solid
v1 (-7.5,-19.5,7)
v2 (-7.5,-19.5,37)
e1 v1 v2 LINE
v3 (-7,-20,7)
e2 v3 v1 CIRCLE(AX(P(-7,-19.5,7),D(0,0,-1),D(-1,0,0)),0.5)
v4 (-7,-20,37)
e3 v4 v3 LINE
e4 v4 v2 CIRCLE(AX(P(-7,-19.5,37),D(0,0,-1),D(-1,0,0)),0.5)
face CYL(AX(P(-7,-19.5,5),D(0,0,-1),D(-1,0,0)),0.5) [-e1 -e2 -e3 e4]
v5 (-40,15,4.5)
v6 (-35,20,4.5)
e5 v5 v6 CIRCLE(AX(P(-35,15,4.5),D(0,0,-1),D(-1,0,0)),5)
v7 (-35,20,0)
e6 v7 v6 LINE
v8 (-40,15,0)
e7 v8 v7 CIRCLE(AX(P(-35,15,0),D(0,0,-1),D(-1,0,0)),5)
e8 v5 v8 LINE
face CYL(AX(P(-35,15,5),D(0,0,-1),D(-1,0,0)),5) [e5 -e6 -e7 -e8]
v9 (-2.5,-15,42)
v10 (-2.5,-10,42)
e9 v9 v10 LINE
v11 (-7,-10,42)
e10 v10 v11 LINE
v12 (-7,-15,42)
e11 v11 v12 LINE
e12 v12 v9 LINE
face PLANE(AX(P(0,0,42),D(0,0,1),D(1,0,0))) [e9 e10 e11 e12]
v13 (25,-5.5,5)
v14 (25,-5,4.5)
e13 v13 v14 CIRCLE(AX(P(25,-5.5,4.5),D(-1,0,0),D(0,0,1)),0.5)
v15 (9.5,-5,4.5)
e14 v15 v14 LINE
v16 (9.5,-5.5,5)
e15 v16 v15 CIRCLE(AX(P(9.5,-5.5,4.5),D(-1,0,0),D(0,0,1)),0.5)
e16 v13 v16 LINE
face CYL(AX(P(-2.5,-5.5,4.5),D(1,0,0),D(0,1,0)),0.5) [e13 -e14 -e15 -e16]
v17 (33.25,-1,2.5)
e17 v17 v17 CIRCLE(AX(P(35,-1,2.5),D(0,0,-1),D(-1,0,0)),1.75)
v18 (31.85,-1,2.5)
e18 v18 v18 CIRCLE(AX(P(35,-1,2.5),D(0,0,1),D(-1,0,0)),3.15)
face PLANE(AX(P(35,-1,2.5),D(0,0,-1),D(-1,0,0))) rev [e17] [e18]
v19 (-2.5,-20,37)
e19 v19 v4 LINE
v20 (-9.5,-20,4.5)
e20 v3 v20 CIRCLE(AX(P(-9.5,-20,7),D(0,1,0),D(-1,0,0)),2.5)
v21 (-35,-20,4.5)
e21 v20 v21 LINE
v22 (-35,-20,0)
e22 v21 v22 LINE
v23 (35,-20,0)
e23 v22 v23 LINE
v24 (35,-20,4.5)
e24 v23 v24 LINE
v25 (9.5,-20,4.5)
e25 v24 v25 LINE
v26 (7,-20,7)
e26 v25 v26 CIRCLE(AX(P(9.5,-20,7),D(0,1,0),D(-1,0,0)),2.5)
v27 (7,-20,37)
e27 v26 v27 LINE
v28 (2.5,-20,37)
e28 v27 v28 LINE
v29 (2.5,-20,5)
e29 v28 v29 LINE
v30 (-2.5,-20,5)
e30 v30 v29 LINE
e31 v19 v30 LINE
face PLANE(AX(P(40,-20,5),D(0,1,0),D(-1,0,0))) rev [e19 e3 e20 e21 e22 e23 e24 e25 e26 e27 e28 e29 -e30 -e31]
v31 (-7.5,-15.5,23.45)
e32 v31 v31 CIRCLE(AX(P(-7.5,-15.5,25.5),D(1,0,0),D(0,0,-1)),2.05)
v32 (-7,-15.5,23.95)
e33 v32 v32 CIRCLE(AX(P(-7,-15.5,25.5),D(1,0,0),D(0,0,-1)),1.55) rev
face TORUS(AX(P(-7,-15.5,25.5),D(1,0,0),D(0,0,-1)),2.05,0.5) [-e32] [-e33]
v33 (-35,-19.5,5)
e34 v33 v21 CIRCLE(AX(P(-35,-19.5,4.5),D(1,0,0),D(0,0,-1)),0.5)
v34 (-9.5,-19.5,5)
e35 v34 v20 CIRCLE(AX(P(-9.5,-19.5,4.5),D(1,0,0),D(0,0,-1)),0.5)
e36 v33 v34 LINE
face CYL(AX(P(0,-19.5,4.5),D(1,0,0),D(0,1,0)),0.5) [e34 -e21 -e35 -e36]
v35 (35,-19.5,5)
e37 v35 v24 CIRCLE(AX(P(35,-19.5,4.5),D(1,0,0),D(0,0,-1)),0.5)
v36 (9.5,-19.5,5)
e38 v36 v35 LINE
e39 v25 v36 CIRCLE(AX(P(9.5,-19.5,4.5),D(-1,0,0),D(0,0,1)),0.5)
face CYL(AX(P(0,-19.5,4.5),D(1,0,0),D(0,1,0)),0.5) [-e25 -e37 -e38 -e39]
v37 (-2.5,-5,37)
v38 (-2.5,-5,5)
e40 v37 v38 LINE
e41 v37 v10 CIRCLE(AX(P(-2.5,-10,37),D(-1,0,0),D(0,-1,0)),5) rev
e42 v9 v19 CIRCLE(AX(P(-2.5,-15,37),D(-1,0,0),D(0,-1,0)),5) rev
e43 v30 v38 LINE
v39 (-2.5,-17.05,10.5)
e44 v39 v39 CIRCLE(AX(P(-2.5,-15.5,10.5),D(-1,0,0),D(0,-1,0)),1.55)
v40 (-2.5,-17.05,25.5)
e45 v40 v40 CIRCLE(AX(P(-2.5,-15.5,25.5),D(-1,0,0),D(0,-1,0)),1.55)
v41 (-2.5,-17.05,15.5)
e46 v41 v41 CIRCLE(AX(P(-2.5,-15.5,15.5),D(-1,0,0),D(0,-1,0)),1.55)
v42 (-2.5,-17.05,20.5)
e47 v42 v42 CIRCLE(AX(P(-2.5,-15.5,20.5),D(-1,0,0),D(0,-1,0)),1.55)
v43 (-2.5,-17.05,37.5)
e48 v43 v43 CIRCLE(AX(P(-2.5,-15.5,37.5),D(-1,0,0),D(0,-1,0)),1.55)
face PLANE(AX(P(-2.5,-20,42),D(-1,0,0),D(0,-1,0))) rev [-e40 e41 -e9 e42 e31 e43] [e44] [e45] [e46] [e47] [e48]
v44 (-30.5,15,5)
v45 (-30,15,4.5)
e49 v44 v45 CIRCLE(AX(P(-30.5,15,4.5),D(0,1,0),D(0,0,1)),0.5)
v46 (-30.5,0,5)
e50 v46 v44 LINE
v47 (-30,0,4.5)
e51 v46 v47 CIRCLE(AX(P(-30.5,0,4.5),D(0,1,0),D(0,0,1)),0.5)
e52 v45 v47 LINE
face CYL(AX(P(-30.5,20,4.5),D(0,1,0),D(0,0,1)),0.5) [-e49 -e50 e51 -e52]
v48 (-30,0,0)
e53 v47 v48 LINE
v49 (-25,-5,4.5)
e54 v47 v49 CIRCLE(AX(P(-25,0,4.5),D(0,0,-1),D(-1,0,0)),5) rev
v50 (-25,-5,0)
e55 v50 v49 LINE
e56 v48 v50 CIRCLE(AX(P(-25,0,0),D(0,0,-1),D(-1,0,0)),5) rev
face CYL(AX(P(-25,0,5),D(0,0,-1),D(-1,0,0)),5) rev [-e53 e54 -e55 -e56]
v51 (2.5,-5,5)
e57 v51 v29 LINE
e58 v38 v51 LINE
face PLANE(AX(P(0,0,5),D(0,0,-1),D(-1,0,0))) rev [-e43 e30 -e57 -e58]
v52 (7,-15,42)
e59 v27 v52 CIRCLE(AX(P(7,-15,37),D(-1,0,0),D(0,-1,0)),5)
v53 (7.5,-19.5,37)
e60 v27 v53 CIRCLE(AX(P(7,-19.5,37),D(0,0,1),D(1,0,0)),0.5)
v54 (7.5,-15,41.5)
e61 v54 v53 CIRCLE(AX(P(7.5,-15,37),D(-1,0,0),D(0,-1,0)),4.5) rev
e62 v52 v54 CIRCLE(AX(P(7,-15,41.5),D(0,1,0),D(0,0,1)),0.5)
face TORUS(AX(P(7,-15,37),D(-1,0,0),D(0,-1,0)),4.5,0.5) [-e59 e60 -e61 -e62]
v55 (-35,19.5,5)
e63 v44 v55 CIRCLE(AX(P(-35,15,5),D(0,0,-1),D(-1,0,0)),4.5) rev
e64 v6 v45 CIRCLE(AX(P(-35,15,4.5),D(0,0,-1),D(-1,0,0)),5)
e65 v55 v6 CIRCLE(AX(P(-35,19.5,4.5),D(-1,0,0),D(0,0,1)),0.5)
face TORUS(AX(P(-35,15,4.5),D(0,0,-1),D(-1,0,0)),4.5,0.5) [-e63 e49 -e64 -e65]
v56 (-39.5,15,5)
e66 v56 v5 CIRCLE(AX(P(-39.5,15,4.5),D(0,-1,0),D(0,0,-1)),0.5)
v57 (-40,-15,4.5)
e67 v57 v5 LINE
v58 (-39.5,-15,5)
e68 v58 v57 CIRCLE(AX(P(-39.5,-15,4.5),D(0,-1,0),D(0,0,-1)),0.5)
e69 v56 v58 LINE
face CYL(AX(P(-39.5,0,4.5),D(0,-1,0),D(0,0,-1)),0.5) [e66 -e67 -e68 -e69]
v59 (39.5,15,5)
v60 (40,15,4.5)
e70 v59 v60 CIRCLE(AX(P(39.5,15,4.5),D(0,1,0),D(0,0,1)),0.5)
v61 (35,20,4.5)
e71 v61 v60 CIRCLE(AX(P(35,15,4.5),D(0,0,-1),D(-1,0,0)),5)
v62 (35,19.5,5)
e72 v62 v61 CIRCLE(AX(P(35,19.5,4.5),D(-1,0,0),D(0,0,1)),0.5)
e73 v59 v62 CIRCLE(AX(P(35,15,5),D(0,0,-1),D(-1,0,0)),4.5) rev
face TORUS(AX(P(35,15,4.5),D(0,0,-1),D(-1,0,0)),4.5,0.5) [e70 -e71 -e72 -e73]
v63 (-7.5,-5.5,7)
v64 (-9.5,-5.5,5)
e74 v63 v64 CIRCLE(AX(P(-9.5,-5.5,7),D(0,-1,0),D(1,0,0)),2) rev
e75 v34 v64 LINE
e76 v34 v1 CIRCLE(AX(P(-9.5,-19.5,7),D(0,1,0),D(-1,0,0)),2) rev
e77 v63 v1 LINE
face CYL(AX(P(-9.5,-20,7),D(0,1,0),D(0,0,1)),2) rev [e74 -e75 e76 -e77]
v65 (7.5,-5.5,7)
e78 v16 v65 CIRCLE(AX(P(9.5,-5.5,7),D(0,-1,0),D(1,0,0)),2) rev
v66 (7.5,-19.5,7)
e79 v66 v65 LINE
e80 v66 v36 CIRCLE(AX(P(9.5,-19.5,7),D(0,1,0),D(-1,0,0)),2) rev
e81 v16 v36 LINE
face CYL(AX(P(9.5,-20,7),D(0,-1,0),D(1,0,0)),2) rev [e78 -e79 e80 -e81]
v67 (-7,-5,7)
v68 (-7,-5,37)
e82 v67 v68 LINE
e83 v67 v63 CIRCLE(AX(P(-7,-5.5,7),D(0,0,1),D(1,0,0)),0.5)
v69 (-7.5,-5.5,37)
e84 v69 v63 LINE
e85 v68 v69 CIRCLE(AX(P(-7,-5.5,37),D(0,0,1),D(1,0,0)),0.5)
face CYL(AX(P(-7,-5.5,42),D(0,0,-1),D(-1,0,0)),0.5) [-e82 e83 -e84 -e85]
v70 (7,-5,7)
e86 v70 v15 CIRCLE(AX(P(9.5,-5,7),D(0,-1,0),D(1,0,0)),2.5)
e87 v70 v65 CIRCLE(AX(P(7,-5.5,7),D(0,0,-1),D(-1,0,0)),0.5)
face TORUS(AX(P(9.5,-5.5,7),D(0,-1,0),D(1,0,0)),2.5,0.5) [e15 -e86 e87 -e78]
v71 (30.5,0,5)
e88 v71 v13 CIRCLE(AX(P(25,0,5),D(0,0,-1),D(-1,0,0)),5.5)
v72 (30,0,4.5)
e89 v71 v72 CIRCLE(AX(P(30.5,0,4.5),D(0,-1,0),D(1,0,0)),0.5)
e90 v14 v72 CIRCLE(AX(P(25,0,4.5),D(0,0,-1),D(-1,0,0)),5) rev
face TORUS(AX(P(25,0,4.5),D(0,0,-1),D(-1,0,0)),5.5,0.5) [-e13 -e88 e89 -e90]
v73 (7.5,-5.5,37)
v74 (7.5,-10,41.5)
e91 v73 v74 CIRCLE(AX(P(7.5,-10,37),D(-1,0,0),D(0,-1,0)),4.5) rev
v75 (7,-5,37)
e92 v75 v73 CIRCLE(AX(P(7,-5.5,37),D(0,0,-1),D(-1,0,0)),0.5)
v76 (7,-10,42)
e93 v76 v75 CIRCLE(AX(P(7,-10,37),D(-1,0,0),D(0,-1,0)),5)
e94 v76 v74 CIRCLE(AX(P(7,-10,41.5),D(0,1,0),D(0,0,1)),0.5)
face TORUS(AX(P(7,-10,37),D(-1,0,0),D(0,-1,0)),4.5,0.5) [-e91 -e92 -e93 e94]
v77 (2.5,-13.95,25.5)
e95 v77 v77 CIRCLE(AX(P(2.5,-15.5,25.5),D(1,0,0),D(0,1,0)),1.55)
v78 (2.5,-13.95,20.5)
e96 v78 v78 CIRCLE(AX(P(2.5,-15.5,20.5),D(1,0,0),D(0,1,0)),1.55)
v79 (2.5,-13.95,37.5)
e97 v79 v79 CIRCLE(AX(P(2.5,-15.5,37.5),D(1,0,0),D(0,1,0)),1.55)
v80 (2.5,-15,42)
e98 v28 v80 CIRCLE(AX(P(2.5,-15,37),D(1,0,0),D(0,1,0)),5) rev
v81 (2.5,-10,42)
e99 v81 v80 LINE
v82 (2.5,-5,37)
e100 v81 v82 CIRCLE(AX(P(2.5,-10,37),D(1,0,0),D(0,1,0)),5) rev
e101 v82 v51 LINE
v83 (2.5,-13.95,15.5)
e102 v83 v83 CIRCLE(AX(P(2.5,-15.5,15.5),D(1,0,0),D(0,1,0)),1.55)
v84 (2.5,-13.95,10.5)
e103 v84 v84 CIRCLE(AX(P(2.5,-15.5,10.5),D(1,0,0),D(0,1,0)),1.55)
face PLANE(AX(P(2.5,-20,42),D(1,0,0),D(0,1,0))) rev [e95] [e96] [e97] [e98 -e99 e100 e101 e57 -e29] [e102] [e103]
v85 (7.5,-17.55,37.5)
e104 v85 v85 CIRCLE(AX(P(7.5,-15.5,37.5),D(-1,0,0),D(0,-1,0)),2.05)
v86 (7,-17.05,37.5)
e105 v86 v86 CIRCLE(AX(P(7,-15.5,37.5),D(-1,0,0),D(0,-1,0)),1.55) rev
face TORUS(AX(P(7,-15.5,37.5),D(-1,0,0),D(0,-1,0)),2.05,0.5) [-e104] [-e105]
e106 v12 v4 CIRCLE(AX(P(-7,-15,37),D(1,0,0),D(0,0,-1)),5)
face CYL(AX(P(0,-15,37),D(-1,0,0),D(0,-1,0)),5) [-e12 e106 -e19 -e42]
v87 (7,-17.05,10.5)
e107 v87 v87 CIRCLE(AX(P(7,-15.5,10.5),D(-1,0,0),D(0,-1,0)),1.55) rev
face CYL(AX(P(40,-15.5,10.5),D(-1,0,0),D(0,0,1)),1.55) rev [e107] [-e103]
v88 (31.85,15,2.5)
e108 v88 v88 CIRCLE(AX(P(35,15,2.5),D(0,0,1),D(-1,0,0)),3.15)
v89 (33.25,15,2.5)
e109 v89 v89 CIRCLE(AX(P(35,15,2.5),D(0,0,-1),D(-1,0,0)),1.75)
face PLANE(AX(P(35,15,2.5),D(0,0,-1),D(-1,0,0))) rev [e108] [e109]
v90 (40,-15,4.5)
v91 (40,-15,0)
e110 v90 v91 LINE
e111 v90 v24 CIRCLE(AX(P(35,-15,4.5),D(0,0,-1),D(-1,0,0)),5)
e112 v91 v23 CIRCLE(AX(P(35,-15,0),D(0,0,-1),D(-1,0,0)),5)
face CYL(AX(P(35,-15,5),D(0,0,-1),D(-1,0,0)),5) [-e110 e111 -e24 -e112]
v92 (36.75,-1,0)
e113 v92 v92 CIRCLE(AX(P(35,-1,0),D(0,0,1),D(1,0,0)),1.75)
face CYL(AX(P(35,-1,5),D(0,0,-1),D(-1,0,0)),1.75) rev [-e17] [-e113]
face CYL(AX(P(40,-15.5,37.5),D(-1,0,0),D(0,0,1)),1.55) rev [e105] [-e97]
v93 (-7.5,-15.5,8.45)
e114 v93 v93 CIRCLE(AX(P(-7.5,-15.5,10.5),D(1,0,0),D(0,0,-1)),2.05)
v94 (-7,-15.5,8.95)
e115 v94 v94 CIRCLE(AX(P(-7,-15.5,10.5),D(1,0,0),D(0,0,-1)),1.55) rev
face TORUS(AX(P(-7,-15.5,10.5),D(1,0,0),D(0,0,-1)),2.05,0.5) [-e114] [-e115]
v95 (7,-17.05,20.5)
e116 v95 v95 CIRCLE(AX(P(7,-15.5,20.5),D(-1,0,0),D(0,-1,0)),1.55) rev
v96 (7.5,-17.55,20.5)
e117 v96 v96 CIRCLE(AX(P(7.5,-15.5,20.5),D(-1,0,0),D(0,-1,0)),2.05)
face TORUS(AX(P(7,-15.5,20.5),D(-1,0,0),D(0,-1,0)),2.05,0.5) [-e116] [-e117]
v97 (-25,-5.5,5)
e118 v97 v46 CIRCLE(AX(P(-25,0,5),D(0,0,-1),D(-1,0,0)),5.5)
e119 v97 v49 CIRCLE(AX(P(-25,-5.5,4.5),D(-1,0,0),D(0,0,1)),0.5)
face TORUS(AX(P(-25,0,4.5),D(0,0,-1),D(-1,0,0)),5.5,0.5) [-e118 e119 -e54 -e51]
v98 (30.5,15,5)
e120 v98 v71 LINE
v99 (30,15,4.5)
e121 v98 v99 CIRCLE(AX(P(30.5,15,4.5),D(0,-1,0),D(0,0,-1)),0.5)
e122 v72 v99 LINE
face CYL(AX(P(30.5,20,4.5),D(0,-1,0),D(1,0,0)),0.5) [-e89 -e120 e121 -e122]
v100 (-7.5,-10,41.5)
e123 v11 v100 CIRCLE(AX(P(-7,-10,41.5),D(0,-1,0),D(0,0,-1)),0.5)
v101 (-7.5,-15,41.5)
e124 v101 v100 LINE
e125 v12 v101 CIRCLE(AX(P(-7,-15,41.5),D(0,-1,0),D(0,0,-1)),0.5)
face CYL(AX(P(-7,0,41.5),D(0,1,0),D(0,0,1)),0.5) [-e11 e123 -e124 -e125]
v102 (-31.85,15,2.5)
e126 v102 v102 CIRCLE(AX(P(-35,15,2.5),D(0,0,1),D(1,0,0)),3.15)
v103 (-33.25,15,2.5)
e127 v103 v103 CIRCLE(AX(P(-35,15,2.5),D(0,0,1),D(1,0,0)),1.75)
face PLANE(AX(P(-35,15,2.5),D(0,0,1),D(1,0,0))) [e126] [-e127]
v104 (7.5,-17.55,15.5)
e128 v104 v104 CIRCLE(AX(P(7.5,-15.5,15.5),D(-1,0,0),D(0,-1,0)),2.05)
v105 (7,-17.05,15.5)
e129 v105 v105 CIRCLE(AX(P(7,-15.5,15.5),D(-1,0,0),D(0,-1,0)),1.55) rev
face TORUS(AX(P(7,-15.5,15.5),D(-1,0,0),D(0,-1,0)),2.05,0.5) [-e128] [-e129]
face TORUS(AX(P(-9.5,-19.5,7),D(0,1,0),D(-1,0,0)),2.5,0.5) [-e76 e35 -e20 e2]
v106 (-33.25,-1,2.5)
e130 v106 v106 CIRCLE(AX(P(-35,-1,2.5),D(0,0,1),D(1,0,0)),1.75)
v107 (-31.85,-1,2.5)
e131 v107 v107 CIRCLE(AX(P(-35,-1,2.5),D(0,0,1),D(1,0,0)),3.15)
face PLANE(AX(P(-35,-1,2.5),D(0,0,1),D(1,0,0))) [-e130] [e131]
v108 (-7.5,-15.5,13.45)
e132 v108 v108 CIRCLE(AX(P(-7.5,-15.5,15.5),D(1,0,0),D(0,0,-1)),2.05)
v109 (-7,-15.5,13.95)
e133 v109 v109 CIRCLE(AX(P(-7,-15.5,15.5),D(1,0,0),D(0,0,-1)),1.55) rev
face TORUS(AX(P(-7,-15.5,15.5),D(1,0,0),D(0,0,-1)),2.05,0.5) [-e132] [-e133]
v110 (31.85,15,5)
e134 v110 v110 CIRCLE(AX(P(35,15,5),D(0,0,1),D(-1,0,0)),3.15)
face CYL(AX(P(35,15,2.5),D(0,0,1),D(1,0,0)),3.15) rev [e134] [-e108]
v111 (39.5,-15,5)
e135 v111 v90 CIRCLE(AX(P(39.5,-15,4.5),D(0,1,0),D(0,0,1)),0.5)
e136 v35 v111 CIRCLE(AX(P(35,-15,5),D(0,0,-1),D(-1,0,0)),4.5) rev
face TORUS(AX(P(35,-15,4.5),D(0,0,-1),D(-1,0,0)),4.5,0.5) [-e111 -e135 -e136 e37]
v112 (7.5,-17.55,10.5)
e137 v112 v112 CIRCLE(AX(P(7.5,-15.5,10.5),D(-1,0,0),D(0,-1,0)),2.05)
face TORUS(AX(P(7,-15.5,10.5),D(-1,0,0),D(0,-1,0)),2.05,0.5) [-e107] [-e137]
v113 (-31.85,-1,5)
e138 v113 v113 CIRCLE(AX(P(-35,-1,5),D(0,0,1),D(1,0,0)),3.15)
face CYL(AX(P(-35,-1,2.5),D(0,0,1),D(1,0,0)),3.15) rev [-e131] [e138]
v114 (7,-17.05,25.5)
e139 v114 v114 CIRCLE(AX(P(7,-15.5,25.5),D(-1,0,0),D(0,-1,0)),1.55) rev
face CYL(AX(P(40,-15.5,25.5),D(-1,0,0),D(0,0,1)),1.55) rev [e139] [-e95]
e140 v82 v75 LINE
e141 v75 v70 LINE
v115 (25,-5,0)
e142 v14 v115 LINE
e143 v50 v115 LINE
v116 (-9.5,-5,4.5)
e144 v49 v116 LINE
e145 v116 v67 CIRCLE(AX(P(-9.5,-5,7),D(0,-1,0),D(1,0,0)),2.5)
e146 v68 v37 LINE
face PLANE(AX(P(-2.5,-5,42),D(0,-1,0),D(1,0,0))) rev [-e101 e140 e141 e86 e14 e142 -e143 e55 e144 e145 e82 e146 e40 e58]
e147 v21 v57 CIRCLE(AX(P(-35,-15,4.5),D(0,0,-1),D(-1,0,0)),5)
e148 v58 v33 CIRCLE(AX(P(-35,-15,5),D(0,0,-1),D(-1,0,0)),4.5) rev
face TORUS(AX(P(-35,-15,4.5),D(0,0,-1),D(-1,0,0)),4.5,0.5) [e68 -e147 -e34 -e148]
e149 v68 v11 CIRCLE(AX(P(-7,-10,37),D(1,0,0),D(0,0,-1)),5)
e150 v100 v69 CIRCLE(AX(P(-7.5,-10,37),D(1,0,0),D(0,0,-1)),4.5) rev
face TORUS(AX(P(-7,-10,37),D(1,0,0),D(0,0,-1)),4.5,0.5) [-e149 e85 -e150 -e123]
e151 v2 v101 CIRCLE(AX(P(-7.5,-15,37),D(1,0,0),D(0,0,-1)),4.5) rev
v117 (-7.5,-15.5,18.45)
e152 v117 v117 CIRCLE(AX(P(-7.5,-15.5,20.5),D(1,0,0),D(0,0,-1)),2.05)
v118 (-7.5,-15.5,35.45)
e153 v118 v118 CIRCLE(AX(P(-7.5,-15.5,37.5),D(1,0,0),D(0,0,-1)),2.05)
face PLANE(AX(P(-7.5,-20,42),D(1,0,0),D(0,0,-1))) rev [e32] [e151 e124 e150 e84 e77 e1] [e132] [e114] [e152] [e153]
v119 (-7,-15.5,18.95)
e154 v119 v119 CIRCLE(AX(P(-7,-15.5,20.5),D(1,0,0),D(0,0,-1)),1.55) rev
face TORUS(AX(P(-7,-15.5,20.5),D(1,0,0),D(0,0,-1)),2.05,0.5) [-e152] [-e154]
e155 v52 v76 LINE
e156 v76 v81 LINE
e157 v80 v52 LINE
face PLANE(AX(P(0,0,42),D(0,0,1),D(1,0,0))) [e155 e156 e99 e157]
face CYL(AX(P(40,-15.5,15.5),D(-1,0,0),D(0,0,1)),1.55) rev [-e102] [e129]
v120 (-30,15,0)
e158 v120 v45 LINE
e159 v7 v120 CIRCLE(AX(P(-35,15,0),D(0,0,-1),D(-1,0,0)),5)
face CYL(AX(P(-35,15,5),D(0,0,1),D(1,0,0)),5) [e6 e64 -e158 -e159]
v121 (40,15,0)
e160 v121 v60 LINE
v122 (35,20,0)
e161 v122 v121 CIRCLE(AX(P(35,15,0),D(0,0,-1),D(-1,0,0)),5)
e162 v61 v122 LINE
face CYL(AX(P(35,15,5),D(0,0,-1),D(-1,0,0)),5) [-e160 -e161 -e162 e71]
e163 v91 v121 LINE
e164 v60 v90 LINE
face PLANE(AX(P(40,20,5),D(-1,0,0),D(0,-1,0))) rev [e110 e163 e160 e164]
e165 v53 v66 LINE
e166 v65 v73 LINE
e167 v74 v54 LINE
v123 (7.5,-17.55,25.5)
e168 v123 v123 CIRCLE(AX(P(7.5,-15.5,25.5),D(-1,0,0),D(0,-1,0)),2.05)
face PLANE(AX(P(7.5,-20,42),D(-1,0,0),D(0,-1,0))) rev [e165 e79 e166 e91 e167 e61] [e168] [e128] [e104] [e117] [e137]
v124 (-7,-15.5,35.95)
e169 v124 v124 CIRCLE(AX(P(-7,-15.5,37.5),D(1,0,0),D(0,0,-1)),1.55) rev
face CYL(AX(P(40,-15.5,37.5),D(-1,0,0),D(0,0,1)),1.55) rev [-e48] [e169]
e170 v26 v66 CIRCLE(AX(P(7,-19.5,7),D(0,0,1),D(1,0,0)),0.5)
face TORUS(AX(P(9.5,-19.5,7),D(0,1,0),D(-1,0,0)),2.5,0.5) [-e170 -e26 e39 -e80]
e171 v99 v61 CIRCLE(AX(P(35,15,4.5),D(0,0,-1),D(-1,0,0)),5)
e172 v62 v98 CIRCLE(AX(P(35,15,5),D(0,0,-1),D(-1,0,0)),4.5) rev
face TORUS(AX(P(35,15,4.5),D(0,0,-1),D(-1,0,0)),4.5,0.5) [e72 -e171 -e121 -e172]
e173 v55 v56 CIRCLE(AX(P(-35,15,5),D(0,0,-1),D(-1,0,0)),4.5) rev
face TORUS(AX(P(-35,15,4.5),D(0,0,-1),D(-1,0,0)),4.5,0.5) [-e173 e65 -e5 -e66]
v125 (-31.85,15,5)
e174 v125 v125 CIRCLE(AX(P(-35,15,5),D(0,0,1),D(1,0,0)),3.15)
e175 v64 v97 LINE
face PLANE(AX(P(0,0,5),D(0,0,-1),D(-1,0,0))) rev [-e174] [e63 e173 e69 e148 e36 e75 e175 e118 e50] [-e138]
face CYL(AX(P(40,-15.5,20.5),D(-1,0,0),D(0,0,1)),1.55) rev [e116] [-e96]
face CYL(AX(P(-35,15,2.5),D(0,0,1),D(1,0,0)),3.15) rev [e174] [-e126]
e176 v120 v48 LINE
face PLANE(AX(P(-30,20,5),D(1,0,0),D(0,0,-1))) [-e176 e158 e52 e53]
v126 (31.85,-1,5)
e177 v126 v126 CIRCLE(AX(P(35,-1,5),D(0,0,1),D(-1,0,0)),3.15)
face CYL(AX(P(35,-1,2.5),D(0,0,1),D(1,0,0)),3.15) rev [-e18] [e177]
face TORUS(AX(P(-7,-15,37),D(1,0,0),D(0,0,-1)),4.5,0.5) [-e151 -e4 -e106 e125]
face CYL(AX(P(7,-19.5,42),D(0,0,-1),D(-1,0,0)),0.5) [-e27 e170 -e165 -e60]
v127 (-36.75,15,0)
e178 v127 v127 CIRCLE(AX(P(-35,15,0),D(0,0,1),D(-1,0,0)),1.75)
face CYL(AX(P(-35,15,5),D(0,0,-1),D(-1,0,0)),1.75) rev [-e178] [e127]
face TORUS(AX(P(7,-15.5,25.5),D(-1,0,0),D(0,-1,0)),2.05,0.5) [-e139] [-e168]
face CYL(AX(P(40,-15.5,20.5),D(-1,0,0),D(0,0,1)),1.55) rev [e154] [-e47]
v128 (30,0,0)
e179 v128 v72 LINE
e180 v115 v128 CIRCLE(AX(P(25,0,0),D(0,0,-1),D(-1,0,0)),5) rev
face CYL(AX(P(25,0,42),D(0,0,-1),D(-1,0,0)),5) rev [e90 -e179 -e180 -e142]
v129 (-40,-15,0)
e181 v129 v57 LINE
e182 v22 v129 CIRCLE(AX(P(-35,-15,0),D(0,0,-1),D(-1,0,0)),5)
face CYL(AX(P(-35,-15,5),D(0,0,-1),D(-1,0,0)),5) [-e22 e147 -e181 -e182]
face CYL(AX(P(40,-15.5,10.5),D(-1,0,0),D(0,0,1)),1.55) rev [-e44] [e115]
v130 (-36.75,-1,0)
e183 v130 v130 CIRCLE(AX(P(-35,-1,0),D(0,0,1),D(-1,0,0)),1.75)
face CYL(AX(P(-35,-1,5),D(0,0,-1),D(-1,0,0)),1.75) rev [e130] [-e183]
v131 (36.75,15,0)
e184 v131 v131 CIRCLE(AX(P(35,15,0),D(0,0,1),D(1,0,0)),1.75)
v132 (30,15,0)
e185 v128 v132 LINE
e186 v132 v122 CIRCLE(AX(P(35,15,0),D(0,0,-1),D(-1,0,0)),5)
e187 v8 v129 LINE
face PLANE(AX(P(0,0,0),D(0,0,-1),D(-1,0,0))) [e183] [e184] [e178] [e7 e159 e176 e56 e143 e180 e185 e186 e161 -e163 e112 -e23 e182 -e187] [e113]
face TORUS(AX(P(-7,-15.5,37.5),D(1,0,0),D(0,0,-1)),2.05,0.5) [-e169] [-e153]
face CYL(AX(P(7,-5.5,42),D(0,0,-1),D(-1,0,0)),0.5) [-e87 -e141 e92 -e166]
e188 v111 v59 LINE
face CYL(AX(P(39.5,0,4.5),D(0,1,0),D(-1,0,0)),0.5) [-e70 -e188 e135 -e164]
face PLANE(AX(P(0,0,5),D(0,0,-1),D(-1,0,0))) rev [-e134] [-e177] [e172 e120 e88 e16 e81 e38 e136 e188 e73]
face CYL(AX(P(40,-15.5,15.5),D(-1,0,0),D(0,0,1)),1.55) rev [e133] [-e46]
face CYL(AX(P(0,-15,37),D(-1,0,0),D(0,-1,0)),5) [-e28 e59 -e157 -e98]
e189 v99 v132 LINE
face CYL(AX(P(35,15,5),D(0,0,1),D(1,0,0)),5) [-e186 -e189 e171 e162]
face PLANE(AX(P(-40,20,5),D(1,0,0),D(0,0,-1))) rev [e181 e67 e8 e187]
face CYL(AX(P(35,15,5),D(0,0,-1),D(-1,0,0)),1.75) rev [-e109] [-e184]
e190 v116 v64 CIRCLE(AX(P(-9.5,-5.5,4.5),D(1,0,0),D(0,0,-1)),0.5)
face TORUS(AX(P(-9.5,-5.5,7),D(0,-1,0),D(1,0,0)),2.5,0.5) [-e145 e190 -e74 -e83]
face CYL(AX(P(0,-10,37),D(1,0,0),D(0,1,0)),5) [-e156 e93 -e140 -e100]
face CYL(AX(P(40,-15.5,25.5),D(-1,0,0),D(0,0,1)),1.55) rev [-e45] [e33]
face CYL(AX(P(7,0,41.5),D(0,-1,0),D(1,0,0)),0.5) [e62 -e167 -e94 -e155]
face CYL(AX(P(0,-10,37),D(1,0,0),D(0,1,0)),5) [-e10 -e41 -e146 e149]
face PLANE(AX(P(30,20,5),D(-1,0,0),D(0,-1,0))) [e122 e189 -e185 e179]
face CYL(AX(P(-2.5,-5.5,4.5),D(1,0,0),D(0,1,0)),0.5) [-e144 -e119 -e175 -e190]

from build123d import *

# Parameters (mm, degrees)
SKETCH_1_W          = 80
SKETCH_1_H          = 40
EXTRUDE_1_DEPTH     = 5
SKETCH_2_R          = 1.75
CUT_EXTRUDE_1_DEPTH = 46
SKETCH_3_W          = 5
SKETCH_3_H          = 15
EXTRUDE_2_DEPTH     = 37
SKETCH_4_R          = 1.55
CUT_EXTRUDE_2_DEPTH = 67.484960705
SKETCH_5_W          = 60
SKETCH_5_H          = 25
CUT_EXTRUDE_3_DEPTH = 5
FILLET_1_R          = 5
FILLET_2_R          = 5
FILLET_3_R          = 2
FILLET_4_R          = 0.5
SKETCH_6_R          = 3.15
CUT_EXTRUDE_4_DEPTH = 2.5


with BuildPart() as part:
    # ｽｹｯﾁ1 → ﾎﾞｽ - 押し出し1 (new body)
    with BuildSketch(Plane.XY):
        Rectangle(SKETCH_1_W, SKETCH_1_H)
    extrude(amount=EXTRUDE_1_DEPTH)

    # ｽｹｯﾁ2 → ｶｯﾄ - 押し出し1 (cut, through all)
    with BuildSketch(Plane.XY):
        with Locations((35, 15)):
            Circle(SKETCH_2_R)
        with Locations((35, -1)):
            Circle(SKETCH_2_R)
        with Locations(Location((-35, 15, 0), (0, 0, 180))):
            Circle(SKETCH_2_R)
        with Locations(Location((-35, -1, 0), (0, 0, 180))):
            Circle(SKETCH_2_R)
    extrude(amount=CUT_EXTRUDE_1_DEPTH, mode=Mode.SUBTRACT)

    # ｽｹｯﾁ3 → ﾎﾞｽ - 押し出し2 (add)
    with BuildSketch(Plane.XY.offset(5)):
        with Locations((5, -12.5)):
            Rectangle(SKETCH_3_W, SKETCH_3_H)
        with Locations((-5, -12.5)):
            Rectangle(SKETCH_3_W, SKETCH_3_H)
    extrude(amount=EXTRUDE_2_DEPTH)

    # ｽｹｯﾁ4 → ｶｯﾄ - 押し出し2 (cut, through all)
    with BuildSketch(Plane.ZY.offset(7.5)):
        with Locations(Location((10.5, -15.5, 0), (0, 0, 90))):
            Circle(SKETCH_4_R)
        with Locations(Location((37.5, -15.5, 0), (0, 0, 90))):
            Circle(SKETCH_4_R)
        with Locations(Location((15.5, -15.5, 0), (0, 0, 90))):
            Circle(SKETCH_4_R)
        with Locations(Location((20.5, -15.5, 0), (0, 0, 90))):
            Circle(SKETCH_4_R)
        with Locations(Location((25.5, -15.5, 0), (0, 0, 90))):
            Circle(SKETCH_4_R)
    extrude(amount=-CUT_EXTRUDE_2_DEPTH, mode=Mode.SUBTRACT)

    # ｽｹｯﾁ5 → ｶｯﾄ - 押し出し3 (cut)
    with BuildSketch(Plane.XY):
        with Locations((0, 7.5)):
            Rectangle(SKETCH_5_W, SKETCH_5_H)
    extrude(amount=CUT_EXTRUDE_3_DEPTH, mode=Mode.SUBTRACT)

    # ﾌｨﾚｯﾄ1
    fillet_1_edges = [part.edges().sort_by_distance(p)[0] for p in [
        (5, -5, 42),
        (-5, -5, 42),
        (5, -20, 42),
        (-5, -20, 42),
    ]]
    fillet(fillet_1_edges, radius=FILLET_1_R)

    # ﾌｨﾚｯﾄ2
    fillet_2_edges = [part.edges().sort_by_distance(p)[0] for p in [
        (-30, -5, 2.5),
        (30, -5, 2.5),
        (30, 20, 2.5),
        (40, 20, 2.5),
        (40, -20, 2.5),
        (-40, -20, 2.5),
        (-30, 20, 2.5),
        (-40, 20, 2.5),
    ]]
    fillet(fillet_2_edges, radius=FILLET_2_R - 0.0001)  # a hair under: the kernel refuses the full size

    # ﾌｨﾚｯﾄ3
    fillet_3_edges = [part.edges().sort_by_distance(p)[0] for p in [
        (7.5, -12.5, 5),
        (-7.5, -12.5, 5),
    ]]
    fillet(fillet_3_edges, radius=FILLET_3_R)

    # ﾌｨﾚｯﾄ4
    fillet_4_edges = [part.edges().sort_by_distance(p)[0] for p in [
        (7.5, -12.5, 42),
        (7.5, -5, 22),
        (-7.5, -5, 22),
        (7.5, -20, 22),
        (7.5, -18.535533906, 40.535533906),
        (7.5, -6.464466094, 40.535533906),
        (-7.5, -12.5, 42),
        (-7.5, -20, 22),
        (-7.5, -18.535533906, 40.535533906),
        (-7.5, -6.464466094, 40.535533906),
        (-30, 7.5, 5),
        (-17.25005, -5, 5),
        (30, 7.5, 5),
        (40, 0, 5),
        (38.535563195, -18.535563195, 5),
        (38.535563195, 18.535563195, 5),
        (31.464436805, 18.535563195, 5),
        (-22.25005, -20, 5),
        (-40, 0, 5),
        (-38.535563195, 18.535563195, 5),
        (-31.464436805, 18.535563195, 5),
        (-38.535563195, -18.535563195, 5),
        (-28.535563195, -3.535563195, 5),
        (28.535563195, -3.535563195, 5),
        (17.25005, -5, 5),
        (22.25005, -20, 5),
        (8.085786438, -5, 5.585786438),
        (8.085786438, -20, 5.585786438),
        (-8.085786438, -20, 5.585786438),
        (-8.085786438, -5, 5.585786438),
        (7.5, -17.05, 10.5),
        (-7.5, -17.05, 10.5),
        (7.5, -17.05, 37.5),
        (-7.5, -17.05, 37.5),
        (7.5, -17.05, 15.5),
        (-7.5, -17.05, 15.5),
        (7.5, -17.05, 20.5),
        (-7.5, -17.05, 20.5),
        (7.5, -17.05, 25.5),
        (-7.5, -17.05, 25.5),
    ]]
    fillet(fillet_4_edges, radius=FILLET_4_R)

    # ｽｹｯﾁ6 → ｶｯﾄ - 押し出し4 (cut)
    with BuildSketch(Plane.XY.offset(5)):
        with Locations((-35, 15)):
            Circle(SKETCH_6_R)
        with Locations((-35, -1)):
            Circle(SKETCH_6_R)
        with Locations(Location((35, -1, 0), (0, 0, 180))):
            Circle(SKETCH_6_R)
        with Locations(Location((35, 15, 0), (0, 0, 180))):
            Circle(SKETCH_6_R)
    extrude(amount=-CUT_EXTRUDE_4_DEPTH, mode=Mode.SUBTRACT)


solid = part.part
